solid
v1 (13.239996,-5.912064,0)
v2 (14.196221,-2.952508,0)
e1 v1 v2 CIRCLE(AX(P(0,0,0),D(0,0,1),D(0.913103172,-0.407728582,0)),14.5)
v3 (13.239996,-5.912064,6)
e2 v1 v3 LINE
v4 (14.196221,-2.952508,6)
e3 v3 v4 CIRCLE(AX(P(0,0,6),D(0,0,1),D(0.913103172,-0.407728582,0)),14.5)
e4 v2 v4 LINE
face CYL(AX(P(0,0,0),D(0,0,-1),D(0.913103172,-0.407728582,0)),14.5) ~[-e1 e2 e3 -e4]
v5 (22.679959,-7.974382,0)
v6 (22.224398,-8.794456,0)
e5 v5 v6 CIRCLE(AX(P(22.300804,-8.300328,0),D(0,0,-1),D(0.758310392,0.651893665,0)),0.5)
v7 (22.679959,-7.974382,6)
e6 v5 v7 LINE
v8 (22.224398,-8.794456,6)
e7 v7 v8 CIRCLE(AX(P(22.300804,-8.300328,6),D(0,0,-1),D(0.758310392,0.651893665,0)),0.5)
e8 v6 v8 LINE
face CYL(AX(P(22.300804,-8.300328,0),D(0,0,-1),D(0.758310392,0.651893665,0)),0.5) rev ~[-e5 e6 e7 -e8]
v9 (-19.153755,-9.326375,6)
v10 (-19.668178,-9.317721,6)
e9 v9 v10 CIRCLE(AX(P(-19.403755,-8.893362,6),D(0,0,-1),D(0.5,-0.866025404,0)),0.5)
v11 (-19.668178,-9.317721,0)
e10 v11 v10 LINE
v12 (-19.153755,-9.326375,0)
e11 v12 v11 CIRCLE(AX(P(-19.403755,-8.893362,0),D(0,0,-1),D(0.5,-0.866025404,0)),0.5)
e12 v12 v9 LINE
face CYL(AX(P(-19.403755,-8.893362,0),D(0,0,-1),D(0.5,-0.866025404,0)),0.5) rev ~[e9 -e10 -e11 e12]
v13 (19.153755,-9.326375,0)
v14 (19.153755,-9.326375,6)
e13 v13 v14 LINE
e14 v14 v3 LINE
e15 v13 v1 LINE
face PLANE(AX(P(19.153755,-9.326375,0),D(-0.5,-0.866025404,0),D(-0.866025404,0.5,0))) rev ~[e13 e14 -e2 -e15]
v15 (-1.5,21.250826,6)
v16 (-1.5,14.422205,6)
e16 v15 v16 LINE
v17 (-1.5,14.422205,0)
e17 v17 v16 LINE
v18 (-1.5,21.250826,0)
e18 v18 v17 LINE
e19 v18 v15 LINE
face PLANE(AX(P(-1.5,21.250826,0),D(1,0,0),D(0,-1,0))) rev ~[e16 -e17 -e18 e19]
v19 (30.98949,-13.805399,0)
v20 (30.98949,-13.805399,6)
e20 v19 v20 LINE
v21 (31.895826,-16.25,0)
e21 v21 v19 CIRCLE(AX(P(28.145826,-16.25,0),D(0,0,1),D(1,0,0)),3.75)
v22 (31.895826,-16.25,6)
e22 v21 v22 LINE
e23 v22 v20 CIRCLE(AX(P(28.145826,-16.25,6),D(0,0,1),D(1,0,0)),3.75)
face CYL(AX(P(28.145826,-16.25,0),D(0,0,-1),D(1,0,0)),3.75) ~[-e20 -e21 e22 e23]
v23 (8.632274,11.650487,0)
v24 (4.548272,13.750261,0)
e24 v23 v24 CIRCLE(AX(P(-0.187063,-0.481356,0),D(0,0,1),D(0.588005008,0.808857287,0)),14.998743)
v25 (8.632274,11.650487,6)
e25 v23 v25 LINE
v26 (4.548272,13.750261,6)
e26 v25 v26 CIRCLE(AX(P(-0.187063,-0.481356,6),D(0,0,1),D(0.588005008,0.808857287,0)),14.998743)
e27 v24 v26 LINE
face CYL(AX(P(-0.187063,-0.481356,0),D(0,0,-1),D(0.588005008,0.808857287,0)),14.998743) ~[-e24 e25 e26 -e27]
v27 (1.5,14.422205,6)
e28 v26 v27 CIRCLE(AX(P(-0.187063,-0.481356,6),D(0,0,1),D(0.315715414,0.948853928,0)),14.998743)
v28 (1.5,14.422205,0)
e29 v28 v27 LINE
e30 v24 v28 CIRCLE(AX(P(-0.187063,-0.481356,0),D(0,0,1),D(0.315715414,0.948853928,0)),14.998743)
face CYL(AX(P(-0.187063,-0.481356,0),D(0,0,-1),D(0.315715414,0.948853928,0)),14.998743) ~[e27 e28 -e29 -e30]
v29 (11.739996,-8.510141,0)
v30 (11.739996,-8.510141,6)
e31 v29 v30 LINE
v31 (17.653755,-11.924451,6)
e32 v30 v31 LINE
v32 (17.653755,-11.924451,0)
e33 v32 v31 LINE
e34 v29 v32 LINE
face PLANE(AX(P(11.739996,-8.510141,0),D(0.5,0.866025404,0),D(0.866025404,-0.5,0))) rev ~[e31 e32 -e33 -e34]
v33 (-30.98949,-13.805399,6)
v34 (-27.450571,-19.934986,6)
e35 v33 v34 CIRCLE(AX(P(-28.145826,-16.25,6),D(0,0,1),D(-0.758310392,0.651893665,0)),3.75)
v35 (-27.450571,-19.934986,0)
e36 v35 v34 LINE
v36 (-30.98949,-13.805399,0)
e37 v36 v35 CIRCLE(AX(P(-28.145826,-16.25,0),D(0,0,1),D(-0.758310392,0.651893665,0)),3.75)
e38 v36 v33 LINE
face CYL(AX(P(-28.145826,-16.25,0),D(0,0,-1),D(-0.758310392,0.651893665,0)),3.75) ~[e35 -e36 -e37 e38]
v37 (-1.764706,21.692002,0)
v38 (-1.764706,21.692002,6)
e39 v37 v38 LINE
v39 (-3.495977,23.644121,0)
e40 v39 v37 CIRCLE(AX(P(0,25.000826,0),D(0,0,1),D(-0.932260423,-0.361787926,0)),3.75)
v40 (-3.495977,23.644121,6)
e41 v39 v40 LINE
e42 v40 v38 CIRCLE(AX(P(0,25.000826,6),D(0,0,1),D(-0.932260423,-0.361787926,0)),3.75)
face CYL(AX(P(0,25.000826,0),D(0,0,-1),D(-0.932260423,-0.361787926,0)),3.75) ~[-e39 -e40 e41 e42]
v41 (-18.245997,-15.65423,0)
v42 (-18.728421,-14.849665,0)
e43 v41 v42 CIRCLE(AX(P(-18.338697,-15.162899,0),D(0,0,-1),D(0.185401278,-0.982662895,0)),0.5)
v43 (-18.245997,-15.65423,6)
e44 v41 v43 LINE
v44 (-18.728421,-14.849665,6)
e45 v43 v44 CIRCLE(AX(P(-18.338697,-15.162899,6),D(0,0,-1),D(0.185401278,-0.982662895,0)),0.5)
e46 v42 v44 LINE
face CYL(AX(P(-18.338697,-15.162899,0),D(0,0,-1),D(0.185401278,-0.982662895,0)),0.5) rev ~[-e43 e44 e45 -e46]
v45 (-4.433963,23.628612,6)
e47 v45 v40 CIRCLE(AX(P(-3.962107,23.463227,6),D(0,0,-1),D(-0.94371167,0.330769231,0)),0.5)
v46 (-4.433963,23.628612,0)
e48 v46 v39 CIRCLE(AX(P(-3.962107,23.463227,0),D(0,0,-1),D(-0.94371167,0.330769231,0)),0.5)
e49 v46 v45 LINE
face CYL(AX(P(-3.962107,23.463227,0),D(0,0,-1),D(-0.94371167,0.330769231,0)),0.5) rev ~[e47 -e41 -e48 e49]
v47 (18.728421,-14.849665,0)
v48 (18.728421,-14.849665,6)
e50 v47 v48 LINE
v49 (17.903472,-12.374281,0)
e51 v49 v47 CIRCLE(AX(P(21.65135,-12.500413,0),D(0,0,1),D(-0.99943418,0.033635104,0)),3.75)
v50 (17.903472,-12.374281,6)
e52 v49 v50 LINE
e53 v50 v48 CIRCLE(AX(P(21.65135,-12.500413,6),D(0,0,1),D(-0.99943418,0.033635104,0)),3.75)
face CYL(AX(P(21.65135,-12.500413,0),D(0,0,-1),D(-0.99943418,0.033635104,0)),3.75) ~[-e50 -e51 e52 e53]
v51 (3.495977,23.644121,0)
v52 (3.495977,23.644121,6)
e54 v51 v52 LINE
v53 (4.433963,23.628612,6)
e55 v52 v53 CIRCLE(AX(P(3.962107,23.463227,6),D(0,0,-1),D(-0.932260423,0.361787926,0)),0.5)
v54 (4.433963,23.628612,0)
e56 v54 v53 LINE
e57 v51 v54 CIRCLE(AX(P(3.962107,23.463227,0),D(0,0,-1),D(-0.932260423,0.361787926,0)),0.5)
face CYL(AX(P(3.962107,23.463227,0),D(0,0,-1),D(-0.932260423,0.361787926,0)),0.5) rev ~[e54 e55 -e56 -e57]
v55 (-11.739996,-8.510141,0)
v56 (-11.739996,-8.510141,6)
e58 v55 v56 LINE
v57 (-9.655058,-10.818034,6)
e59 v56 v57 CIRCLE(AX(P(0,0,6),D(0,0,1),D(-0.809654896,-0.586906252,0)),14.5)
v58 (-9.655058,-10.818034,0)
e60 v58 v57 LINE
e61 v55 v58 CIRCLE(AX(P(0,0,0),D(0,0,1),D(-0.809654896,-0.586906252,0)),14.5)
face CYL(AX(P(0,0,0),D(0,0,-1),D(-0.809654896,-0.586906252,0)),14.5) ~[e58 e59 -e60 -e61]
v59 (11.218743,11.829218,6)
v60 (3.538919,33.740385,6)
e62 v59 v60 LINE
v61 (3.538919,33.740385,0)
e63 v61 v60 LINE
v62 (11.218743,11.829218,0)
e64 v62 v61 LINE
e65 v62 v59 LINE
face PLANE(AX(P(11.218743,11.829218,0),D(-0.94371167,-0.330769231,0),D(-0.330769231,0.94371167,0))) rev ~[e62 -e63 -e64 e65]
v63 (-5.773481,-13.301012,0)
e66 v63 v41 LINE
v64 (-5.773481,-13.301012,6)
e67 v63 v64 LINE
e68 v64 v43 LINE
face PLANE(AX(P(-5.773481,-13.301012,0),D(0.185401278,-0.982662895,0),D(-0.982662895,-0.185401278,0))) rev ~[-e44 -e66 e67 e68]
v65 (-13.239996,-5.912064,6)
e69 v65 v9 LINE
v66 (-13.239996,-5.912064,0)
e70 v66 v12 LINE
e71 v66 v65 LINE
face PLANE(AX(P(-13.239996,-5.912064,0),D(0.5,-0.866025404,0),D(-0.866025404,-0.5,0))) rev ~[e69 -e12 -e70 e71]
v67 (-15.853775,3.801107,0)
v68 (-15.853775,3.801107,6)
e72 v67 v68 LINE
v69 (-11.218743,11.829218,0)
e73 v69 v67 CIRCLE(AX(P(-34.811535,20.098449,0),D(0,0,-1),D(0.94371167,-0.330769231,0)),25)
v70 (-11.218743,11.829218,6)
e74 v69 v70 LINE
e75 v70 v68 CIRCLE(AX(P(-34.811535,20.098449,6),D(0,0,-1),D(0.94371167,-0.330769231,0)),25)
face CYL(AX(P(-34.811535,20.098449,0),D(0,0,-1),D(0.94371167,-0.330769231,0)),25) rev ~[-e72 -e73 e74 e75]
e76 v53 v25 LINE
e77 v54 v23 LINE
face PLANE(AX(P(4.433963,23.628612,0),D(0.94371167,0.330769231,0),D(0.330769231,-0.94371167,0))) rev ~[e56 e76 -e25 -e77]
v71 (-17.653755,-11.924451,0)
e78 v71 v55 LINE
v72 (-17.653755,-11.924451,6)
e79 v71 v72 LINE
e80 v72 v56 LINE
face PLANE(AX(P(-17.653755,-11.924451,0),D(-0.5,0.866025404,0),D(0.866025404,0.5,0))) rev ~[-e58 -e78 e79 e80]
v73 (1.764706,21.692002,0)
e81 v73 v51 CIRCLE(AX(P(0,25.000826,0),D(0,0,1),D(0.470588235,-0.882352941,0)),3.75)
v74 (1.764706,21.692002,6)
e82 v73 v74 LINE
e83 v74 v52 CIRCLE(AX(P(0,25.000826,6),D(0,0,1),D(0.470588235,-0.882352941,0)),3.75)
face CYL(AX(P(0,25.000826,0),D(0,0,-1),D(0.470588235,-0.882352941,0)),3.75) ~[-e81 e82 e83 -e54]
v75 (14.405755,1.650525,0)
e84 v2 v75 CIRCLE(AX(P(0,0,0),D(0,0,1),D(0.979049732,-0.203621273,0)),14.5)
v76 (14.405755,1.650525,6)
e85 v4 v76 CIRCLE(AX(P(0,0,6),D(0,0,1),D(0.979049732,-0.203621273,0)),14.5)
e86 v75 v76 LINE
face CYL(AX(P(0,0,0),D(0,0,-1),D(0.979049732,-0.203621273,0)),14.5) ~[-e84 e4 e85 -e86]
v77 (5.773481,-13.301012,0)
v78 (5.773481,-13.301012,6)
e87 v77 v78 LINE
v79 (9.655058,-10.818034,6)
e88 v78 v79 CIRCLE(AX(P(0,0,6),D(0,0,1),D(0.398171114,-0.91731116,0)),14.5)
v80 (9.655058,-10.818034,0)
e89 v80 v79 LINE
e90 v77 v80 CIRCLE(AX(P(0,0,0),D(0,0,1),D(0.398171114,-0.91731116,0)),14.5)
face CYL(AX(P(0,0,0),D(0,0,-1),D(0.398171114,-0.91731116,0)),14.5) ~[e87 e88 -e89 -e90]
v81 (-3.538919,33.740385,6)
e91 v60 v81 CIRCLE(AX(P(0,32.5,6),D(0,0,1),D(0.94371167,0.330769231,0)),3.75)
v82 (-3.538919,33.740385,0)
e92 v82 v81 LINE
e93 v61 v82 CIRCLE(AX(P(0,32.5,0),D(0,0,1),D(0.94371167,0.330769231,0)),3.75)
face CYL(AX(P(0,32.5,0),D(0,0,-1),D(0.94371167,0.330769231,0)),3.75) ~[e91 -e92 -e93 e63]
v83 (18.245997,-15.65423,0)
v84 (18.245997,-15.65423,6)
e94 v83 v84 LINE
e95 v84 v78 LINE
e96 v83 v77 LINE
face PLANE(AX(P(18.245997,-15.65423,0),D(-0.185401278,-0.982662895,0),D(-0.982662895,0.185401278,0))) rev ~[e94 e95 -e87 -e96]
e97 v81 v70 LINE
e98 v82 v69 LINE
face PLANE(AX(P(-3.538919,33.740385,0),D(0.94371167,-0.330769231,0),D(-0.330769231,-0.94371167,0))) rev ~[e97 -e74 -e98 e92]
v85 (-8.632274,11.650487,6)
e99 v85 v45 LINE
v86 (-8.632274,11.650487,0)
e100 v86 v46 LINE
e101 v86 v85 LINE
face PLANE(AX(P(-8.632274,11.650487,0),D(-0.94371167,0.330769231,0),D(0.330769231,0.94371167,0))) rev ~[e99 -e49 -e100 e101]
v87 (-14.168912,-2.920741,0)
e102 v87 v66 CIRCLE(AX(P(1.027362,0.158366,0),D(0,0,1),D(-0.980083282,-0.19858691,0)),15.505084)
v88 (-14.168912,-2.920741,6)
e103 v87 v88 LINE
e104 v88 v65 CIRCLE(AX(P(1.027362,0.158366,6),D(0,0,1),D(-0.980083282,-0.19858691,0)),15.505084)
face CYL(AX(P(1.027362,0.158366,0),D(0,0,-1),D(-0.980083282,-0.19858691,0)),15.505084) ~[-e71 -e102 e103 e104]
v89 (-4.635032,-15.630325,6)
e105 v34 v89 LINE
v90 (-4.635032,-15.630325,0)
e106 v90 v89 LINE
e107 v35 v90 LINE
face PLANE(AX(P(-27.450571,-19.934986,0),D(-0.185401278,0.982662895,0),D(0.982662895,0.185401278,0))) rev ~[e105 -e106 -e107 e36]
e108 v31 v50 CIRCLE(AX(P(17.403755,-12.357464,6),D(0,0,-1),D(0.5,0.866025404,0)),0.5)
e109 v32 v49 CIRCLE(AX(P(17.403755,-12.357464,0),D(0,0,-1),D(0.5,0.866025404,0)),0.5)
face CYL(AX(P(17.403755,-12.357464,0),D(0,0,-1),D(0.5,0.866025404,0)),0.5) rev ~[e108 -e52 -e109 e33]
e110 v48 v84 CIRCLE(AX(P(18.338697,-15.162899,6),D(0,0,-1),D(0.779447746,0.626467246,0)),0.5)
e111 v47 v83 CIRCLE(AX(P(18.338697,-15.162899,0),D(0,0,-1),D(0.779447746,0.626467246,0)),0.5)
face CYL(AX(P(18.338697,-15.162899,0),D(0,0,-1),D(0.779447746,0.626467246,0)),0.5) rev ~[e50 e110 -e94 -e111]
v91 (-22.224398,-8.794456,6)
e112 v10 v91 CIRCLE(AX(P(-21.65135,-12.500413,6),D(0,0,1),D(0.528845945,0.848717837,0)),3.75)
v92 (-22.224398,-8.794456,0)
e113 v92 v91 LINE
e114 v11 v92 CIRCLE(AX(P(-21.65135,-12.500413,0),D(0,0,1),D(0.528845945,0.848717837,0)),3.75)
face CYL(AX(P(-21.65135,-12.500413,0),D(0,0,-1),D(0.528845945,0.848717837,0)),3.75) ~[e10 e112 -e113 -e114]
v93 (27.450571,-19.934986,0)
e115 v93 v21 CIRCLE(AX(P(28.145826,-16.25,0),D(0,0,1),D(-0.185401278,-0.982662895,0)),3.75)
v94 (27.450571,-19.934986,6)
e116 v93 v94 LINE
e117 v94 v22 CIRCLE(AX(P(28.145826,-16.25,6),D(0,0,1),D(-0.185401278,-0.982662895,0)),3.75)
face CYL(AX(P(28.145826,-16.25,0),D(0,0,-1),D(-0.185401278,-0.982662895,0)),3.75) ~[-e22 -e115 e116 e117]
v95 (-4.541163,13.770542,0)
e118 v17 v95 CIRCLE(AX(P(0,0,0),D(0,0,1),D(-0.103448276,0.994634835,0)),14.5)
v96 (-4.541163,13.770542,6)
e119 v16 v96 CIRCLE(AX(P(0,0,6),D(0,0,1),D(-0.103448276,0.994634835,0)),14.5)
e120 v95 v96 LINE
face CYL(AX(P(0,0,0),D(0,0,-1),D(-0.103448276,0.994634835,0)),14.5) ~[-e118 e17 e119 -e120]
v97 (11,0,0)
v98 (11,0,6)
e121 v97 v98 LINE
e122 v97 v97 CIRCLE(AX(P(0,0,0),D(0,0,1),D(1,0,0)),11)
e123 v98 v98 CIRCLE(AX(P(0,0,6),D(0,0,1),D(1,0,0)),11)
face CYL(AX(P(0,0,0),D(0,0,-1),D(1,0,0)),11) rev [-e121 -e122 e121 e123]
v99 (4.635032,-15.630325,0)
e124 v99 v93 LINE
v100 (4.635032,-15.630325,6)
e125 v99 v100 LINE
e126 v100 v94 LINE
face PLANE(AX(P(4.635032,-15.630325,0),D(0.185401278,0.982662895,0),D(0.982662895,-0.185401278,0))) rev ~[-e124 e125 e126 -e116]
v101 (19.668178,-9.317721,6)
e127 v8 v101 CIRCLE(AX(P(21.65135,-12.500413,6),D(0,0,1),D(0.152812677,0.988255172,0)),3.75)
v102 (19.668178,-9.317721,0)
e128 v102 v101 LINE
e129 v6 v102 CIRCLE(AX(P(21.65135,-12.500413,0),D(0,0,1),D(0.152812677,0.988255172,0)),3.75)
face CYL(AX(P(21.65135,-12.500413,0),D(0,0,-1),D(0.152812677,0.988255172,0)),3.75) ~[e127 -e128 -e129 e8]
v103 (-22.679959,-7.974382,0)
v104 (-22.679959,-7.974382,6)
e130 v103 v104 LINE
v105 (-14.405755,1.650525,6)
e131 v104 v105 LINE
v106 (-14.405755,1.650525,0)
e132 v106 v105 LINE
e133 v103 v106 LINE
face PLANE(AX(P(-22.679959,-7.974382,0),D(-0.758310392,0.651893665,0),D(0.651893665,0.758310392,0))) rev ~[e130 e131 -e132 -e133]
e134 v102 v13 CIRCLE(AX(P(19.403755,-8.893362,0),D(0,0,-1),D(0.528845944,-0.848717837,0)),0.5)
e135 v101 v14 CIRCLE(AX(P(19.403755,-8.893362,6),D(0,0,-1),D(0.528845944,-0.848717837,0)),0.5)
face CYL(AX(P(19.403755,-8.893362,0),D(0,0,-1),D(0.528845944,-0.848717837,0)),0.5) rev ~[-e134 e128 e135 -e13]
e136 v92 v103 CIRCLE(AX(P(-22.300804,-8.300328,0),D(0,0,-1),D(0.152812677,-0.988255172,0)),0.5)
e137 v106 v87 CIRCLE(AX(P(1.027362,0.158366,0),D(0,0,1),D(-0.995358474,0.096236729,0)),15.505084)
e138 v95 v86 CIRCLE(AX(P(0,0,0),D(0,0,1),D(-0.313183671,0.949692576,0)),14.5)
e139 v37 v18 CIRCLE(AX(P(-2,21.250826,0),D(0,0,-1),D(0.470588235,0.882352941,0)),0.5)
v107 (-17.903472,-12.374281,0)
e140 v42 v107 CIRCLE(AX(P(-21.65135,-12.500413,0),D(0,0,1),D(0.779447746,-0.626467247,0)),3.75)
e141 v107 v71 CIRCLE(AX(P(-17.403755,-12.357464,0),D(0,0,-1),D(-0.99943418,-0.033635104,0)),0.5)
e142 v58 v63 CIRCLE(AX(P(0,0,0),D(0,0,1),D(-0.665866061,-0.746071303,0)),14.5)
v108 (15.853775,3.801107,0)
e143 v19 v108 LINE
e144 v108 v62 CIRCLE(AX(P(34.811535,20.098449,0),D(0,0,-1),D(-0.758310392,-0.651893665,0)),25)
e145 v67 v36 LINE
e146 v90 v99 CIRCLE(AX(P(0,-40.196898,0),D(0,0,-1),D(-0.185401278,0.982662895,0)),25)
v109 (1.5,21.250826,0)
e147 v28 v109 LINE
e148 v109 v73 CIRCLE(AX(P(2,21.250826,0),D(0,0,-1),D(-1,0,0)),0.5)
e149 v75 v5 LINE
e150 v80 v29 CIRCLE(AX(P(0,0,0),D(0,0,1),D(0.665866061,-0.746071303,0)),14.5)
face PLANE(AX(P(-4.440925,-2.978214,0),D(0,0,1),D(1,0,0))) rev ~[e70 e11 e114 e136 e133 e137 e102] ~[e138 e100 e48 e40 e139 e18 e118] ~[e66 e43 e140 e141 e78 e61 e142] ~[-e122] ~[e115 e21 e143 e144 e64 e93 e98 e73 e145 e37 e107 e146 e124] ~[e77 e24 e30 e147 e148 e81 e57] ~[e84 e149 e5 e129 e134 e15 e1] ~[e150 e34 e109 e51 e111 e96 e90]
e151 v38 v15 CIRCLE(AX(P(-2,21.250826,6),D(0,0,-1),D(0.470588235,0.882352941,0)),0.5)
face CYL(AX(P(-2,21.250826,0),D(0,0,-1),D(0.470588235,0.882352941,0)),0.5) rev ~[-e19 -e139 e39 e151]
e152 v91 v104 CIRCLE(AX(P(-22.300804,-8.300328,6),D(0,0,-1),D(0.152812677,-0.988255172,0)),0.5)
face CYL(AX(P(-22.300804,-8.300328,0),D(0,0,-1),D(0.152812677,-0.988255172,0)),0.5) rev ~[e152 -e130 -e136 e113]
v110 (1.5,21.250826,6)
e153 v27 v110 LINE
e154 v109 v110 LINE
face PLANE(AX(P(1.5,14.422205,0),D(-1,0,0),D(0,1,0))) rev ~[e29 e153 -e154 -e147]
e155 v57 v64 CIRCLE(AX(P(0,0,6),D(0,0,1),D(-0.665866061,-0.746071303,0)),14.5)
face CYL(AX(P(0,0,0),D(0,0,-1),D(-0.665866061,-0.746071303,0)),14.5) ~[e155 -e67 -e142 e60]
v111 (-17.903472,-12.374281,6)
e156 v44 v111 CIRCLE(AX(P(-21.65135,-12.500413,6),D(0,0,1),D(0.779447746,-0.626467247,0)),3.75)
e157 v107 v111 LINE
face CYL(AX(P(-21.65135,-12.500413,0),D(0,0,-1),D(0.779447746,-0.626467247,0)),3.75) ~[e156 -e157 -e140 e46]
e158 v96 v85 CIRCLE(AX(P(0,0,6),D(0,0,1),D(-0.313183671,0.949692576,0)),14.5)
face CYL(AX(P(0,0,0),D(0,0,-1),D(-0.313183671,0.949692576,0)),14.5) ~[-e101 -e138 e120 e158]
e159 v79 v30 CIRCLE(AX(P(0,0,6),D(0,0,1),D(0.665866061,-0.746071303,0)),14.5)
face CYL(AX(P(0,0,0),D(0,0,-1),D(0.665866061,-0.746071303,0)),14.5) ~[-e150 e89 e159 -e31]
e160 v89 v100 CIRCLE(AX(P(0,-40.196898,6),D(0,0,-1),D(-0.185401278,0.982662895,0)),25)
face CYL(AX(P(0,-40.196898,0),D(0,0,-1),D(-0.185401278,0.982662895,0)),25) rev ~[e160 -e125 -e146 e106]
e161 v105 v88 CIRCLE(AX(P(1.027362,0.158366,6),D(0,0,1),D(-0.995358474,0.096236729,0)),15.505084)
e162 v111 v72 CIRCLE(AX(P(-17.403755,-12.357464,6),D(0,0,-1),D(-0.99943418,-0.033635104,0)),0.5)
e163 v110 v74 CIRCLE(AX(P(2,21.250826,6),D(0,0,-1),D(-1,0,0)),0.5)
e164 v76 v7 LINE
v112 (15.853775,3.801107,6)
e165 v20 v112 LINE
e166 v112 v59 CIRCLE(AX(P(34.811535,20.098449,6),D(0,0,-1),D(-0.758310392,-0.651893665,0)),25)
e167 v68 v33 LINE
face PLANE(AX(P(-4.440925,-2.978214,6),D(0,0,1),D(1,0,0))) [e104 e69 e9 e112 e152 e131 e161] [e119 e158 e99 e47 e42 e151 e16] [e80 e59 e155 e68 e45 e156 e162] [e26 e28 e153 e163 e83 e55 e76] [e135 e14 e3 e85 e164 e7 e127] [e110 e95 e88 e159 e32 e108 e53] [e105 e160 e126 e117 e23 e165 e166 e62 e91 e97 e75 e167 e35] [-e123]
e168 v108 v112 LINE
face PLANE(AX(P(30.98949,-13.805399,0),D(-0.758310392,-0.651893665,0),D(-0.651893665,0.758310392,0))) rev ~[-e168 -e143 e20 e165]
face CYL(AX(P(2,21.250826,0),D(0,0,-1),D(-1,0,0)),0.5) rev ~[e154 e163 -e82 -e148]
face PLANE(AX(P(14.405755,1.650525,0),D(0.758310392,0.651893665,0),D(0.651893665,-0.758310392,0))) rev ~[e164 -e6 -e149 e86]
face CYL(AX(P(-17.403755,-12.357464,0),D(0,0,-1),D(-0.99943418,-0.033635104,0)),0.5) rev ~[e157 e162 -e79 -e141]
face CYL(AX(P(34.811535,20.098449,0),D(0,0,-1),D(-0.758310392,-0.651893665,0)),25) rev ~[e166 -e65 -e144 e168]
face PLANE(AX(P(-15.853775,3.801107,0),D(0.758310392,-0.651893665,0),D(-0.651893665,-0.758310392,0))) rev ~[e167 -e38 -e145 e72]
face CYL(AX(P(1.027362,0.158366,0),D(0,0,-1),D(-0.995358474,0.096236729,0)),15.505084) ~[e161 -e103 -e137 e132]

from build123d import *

# Parameters (mm, degrees)
F0_R     = 11
F1_DEPTH = 6


# Not quite as in the source:
# - a feature names something its author has since deleted; it is built from what else it names


with BuildPart() as f1:
    # F0 (on Top) → F1 (new body)
    with BuildSketch(Plane.XY):
        with BuildLine():
            Line((-17.653754974, -11.924450994), (-11.7399959968, -8.5101406566))
            ThreePointArc((-11.7399959968, -8.5101406566), (-10.7595852813, -9.7201504399), (-9.655057883, -10.8180338914))
            ThreePointArc((-9.655057883, -10.8180338914), (-7.8135298696, -12.2146940599), (-5.7734811503, -13.3010118189))
            Line((-5.7734811503, -13.3010118189), (-18.2459966778, -15.6542301338))
            ThreePointArc((-18.2459966778, -15.6542301338), (-18.7675177207, -15.4200232887), (-18.72842119, -14.8496650628))
            ThreePointArc((-18.72842119, -14.8496650628), (-21.1687491133, -16.2192293875), (-23.8778204631, -15.5179168796))
            ThreePointArc((-23.8778204631, -15.5179168796), (-24.4287426612, -15.0200539994), (-24.8707648644, -14.4233974084))
            ThreePointArc((-24.8707648644, -14.4233974084), (-24.516502143, -15.306331055), (-24.395825623, -16.25))
            ThreePointArc((-24.395825623, -16.25), (-25.2588111204, -18.643250355), (-27.4505708292, -19.9349858577))
            Line((-27.4505708292, -19.9349858577), (-4.6350319583, -15.6303254372))
            ThreePointArc((-4.6350319583, -15.6303254372), (0, -15.1968978222), (4.6350319583, -15.6303254372))
            Line((4.6350319583, -15.6303254372), (27.4505708292, -19.9349858577))
            ThreePointArc((27.4505708292, -19.9349858577), (24.7494668073, -17.8397316739), (24.8707648644, -14.4233974084))
            ThreePointArc((24.8707648644, -14.4233974084), (27.7689882832, -12.5189822274), (30.9894895915, -13.8053987576))
            Line((30.9894895915, -13.8053987576), (15.8537748772, 3.8011072954))
            ThreePointArc((15.8537748772, 3.8011072954), (13.1608995727, 7.5984489111), (11.2187429189, 11.8292181419))
            Line((11.2187429189, 11.8292181419), (3.5389187623, 33.7403846154))
            ThreePointArc((3.5389187623, 33.7403846154), (0, 36.25), (-3.5389187623, 33.7403846154))
            Line((-3.5389187623, 33.7403846154), (-11.2187429189, 11.8292181419))
            ThreePointArc((-11.2187429189, 11.8292181419), (-13.1608995727, 7.5984489111), (-15.8537748772, 3.8011072954))
            Line((-15.8537748772, 3.8011072954), (-30.9894895915, -13.8053987576))
            ThreePointArc((-30.9894895915, -13.8053987576), (-27.8243942299, -12.5138011483), (-24.9264109967, -14.32701548))
            ThreePointArc((-24.9264109967, -14.32701548), (-25.2221196603, -13.6458847274), (-25.3778204631, -12.9198406683))
            ThreePointArc((-25.3778204631, -12.9198406683), (-24.630639236, -10.2230598047), (-22.2243977771, -8.7944559919))
            ThreePointArc((-22.2243977771, -8.7944559919), (-22.7378907553, -8.5431354678), (-22.6799593114, -7.9743815734))
            Line((-22.6799593114, -7.9743815734), (-14.4057547064, 1.650524565))
            ThreePointArc((-14.4057547064, 1.650524565), (-14.4569527647, -0.6438963434), (-14.1689115613, -2.9207408288))
            ThreePointArc((-14.1689115613, -2.9207408288), (-13.7801833851, -4.4399194539), (-13.2399959968, -5.9120644453))
            Line((-13.2399959968, -5.9120644453), (-19.153754974, -9.3263747827))
            ThreePointArc((-19.153754974, -9.3263747827), (-19.4121649397, -9.3932913482), (-19.6681779463, -9.3177209993))
            ThreePointArc((-19.6681779463, -9.3177209993), (-18.403754974, -10.6254128883), (-17.9034720639, -12.374281248))
            ThreePointArc((-17.9034720639, -12.374281248), (-17.8409114026, -12.1147823061), (-17.653754974, -11.924450994))
        make_face()
        with BuildLine():
            ThreePointArc((17.9034720639, -12.374281248), (18.093710781, -13.6860357173), (18.72842119, -14.8496650628))
            ThreePointArc((18.72842119, -14.8496650628), (18.7675177207, -15.4200232887), (18.2459966778, -15.6542301338))
            Line((18.2459966778, -15.6542301338), (5.7734811503, -13.3010118189))
            ThreePointArc((5.7734811503, -13.3010118189), (7.8135298696, -12.2146940599), (9.655057883, -10.8180338914))
            ThreePointArc((9.655057883, -10.8180338914), (10.7595852813, -9.7201504399), (11.7399959968, -8.5101406566))
            Line((11.7399959968, -8.5101406566), (17.653754974, -11.924450994))
            ThreePointArc((17.653754974, -11.924450994), (17.8409114026, -12.1147823061), (17.9034720639, -12.374281248))
        make_face(mode=Mode.SUBTRACT)
        Circle(F0_R, mode=Mode.SUBTRACT)
        with BuildLine():
            ThreePointArc((22.2243977771, -8.7944559919), (20.8993099987, -8.8265953264), (19.6681779463, -9.3177209993))
            ThreePointArc((19.6681779463, -9.3177209993), (19.4121649397, -9.3932913482), (19.153754974, -9.3263747827))
            Line((19.153754974, -9.3263747827), (13.2399959968, -5.9120644453))
            ThreePointArc((13.2399959968, -5.9120644453), (13.7976898502, -4.4579989679), (14.1962211105, -2.952508456))
            ThreePointArc((14.1962211105, -2.952508456), (14.4850002901, -0.6593683303), (14.4057547064, 1.650524565))
            Line((14.4057547064, 1.650524565), (22.6799593114, -7.9743815734))
            ThreePointArc((22.6799593114, -7.9743815734), (22.7378907553, -8.5431354678), (22.2243977771, -8.7944559919))
        make_face(mode=Mode.SUBTRACT)
        with BuildLine():
            ThreePointArc((-3.4959765871, 23.6441210547), (-2.8055992178, 22.5126310437), (-1.7647058824, 21.6920022473))
            ThreePointArc((-1.7647058824, 21.6920022473), (-1.5712535371, 21.5080736544), (-1.5, 21.2508257767))
            Line((-1.5, 21.2508257767), (-1.5, 14.4222051019))
            ThreePointArc((-1.5, 14.4222051019), (-3.0381045689, 14.1781494077), (-4.5411632274, 13.7705423474))
            ThreePointArc((-4.5411632274, 13.7705423474), (-6.6714704205, 12.8740623902), (-8.632273556, 11.6504872539))
            Line((-8.632273556, 11.6504872539), (-4.4339626337, 23.6286117072))
            ThreePointArc((-4.4339626337, 23.6286117072), (-3.9703730346, 23.9631587565), (-3.4959765871, 23.6441210547))
        make_face(mode=Mode.SUBTRACT)
        with BuildLine():
            ThreePointArc((3.4959765871, 23.6441210547), (3.9703730346, 23.9631587565), (4.4339626337, 23.6286117072))
            Line((4.4339626337, 23.6286117072), (8.632273556, 11.6504872539))
            ThreePointArc((8.632273556, 11.6504872539), (6.6711103348, 12.8576010839), (4.5482718222, 13.7502609452))
            ThreePointArc((4.5482718222, 13.7502609452), (3.041663637, 14.1657474781), (1.5, 14.4222051019))
            Line((1.5, 14.4222051019), (1.5, 21.2508257767))
            ThreePointArc((1.5, 21.2508257767), (1.5712535371, 21.5080736544), (1.7647058824, 21.6920022473))
            ThreePointArc((1.7647058824, 21.6920022473), (2.8055992178, 22.5126310437), (3.4959765871, 23.6441210547))
        make_face(mode=Mode.SUBTRACT)
        with BuildLine():
            ThreePointArc((-18.72842119, -14.8496650628), (-18.093710781, -13.6860357173), (-17.9034720639, -12.374281248))
            ThreePointArc((-17.9034720639, -12.374281248), (-18.403754974, -10.6254128883), (-19.6681779463, -9.3177209993))
            ThreePointArc((-19.6681779463, -9.3177209993), (-20.8993099987, -8.8265953264), (-22.2243977771, -8.7944559919))
            ThreePointArc((-22.2243977771, -8.7944559919), (-24.630639236, -10.2230598047), (-25.3778204631, -12.9198406683))
            ThreePointArc((-25.3778204631, -12.9198406683), (-25.2221196603, -13.6458847274), (-24.9264109967, -14.32701548))
            ThreePointArc((-24.9264109967, -14.32701548), (-24.8982303588, -14.375), (-24.8707648644, -14.4233974084))
            ThreePointArc((-24.8707648644, -14.4233974084), (-24.4287426612, -15.0200539994), (-23.8778204631, -15.5179168796))
            ThreePointArc((-23.8778204631, -15.5179168796), (-21.1687491133, -16.2192293875), (-18.72842119, -14.8496650628))
        make_face()
        with BuildLine():
            ThreePointArc((-24.395825623, -16.25), (-24.516502143, -15.306331055), (-24.8707648644, -14.4233974084))
            ThreePointArc((-24.8707648644, -14.4233974084), (-24.8982303588, -14.375), (-24.9264109967, -14.32701548))
            ThreePointArc((-24.9264109967, -14.32701548), (-27.8243942299, -12.5138011483), (-30.9894895915, -13.8053987576))
            ThreePointArc((-30.9894895915, -13.8053987576), (-31.3934208872, -18.125), (-27.4505708292, -19.9349858577))
            ThreePointArc((-27.4505708292, -19.9349858577), (-25.2588111204, -18.643250355), (-24.395825623, -16.25))
        make_face()
        with BuildLine():
            ThreePointArc((24.8707648644, -14.4233974084), (24.7494668073, -17.8397316739), (27.4505708292, -19.9349858577))
            ThreePointArc((27.4505708292, -19.9349858577), (30.539075978, -19.1370145026), (31.895825623, -16.25))
            ThreePointArc((31.895825623, -16.25), (31.6619484793, -14.9463972771), (30.9894895915, -13.8053987576))
            ThreePointArc((30.9894895915, -13.8053987576), (27.7689882832, -12.5189822274), (24.8707648644, -14.4233974084))
        make_face()
    extrude(amount=F1_DEPTH)


solid = f1.part
